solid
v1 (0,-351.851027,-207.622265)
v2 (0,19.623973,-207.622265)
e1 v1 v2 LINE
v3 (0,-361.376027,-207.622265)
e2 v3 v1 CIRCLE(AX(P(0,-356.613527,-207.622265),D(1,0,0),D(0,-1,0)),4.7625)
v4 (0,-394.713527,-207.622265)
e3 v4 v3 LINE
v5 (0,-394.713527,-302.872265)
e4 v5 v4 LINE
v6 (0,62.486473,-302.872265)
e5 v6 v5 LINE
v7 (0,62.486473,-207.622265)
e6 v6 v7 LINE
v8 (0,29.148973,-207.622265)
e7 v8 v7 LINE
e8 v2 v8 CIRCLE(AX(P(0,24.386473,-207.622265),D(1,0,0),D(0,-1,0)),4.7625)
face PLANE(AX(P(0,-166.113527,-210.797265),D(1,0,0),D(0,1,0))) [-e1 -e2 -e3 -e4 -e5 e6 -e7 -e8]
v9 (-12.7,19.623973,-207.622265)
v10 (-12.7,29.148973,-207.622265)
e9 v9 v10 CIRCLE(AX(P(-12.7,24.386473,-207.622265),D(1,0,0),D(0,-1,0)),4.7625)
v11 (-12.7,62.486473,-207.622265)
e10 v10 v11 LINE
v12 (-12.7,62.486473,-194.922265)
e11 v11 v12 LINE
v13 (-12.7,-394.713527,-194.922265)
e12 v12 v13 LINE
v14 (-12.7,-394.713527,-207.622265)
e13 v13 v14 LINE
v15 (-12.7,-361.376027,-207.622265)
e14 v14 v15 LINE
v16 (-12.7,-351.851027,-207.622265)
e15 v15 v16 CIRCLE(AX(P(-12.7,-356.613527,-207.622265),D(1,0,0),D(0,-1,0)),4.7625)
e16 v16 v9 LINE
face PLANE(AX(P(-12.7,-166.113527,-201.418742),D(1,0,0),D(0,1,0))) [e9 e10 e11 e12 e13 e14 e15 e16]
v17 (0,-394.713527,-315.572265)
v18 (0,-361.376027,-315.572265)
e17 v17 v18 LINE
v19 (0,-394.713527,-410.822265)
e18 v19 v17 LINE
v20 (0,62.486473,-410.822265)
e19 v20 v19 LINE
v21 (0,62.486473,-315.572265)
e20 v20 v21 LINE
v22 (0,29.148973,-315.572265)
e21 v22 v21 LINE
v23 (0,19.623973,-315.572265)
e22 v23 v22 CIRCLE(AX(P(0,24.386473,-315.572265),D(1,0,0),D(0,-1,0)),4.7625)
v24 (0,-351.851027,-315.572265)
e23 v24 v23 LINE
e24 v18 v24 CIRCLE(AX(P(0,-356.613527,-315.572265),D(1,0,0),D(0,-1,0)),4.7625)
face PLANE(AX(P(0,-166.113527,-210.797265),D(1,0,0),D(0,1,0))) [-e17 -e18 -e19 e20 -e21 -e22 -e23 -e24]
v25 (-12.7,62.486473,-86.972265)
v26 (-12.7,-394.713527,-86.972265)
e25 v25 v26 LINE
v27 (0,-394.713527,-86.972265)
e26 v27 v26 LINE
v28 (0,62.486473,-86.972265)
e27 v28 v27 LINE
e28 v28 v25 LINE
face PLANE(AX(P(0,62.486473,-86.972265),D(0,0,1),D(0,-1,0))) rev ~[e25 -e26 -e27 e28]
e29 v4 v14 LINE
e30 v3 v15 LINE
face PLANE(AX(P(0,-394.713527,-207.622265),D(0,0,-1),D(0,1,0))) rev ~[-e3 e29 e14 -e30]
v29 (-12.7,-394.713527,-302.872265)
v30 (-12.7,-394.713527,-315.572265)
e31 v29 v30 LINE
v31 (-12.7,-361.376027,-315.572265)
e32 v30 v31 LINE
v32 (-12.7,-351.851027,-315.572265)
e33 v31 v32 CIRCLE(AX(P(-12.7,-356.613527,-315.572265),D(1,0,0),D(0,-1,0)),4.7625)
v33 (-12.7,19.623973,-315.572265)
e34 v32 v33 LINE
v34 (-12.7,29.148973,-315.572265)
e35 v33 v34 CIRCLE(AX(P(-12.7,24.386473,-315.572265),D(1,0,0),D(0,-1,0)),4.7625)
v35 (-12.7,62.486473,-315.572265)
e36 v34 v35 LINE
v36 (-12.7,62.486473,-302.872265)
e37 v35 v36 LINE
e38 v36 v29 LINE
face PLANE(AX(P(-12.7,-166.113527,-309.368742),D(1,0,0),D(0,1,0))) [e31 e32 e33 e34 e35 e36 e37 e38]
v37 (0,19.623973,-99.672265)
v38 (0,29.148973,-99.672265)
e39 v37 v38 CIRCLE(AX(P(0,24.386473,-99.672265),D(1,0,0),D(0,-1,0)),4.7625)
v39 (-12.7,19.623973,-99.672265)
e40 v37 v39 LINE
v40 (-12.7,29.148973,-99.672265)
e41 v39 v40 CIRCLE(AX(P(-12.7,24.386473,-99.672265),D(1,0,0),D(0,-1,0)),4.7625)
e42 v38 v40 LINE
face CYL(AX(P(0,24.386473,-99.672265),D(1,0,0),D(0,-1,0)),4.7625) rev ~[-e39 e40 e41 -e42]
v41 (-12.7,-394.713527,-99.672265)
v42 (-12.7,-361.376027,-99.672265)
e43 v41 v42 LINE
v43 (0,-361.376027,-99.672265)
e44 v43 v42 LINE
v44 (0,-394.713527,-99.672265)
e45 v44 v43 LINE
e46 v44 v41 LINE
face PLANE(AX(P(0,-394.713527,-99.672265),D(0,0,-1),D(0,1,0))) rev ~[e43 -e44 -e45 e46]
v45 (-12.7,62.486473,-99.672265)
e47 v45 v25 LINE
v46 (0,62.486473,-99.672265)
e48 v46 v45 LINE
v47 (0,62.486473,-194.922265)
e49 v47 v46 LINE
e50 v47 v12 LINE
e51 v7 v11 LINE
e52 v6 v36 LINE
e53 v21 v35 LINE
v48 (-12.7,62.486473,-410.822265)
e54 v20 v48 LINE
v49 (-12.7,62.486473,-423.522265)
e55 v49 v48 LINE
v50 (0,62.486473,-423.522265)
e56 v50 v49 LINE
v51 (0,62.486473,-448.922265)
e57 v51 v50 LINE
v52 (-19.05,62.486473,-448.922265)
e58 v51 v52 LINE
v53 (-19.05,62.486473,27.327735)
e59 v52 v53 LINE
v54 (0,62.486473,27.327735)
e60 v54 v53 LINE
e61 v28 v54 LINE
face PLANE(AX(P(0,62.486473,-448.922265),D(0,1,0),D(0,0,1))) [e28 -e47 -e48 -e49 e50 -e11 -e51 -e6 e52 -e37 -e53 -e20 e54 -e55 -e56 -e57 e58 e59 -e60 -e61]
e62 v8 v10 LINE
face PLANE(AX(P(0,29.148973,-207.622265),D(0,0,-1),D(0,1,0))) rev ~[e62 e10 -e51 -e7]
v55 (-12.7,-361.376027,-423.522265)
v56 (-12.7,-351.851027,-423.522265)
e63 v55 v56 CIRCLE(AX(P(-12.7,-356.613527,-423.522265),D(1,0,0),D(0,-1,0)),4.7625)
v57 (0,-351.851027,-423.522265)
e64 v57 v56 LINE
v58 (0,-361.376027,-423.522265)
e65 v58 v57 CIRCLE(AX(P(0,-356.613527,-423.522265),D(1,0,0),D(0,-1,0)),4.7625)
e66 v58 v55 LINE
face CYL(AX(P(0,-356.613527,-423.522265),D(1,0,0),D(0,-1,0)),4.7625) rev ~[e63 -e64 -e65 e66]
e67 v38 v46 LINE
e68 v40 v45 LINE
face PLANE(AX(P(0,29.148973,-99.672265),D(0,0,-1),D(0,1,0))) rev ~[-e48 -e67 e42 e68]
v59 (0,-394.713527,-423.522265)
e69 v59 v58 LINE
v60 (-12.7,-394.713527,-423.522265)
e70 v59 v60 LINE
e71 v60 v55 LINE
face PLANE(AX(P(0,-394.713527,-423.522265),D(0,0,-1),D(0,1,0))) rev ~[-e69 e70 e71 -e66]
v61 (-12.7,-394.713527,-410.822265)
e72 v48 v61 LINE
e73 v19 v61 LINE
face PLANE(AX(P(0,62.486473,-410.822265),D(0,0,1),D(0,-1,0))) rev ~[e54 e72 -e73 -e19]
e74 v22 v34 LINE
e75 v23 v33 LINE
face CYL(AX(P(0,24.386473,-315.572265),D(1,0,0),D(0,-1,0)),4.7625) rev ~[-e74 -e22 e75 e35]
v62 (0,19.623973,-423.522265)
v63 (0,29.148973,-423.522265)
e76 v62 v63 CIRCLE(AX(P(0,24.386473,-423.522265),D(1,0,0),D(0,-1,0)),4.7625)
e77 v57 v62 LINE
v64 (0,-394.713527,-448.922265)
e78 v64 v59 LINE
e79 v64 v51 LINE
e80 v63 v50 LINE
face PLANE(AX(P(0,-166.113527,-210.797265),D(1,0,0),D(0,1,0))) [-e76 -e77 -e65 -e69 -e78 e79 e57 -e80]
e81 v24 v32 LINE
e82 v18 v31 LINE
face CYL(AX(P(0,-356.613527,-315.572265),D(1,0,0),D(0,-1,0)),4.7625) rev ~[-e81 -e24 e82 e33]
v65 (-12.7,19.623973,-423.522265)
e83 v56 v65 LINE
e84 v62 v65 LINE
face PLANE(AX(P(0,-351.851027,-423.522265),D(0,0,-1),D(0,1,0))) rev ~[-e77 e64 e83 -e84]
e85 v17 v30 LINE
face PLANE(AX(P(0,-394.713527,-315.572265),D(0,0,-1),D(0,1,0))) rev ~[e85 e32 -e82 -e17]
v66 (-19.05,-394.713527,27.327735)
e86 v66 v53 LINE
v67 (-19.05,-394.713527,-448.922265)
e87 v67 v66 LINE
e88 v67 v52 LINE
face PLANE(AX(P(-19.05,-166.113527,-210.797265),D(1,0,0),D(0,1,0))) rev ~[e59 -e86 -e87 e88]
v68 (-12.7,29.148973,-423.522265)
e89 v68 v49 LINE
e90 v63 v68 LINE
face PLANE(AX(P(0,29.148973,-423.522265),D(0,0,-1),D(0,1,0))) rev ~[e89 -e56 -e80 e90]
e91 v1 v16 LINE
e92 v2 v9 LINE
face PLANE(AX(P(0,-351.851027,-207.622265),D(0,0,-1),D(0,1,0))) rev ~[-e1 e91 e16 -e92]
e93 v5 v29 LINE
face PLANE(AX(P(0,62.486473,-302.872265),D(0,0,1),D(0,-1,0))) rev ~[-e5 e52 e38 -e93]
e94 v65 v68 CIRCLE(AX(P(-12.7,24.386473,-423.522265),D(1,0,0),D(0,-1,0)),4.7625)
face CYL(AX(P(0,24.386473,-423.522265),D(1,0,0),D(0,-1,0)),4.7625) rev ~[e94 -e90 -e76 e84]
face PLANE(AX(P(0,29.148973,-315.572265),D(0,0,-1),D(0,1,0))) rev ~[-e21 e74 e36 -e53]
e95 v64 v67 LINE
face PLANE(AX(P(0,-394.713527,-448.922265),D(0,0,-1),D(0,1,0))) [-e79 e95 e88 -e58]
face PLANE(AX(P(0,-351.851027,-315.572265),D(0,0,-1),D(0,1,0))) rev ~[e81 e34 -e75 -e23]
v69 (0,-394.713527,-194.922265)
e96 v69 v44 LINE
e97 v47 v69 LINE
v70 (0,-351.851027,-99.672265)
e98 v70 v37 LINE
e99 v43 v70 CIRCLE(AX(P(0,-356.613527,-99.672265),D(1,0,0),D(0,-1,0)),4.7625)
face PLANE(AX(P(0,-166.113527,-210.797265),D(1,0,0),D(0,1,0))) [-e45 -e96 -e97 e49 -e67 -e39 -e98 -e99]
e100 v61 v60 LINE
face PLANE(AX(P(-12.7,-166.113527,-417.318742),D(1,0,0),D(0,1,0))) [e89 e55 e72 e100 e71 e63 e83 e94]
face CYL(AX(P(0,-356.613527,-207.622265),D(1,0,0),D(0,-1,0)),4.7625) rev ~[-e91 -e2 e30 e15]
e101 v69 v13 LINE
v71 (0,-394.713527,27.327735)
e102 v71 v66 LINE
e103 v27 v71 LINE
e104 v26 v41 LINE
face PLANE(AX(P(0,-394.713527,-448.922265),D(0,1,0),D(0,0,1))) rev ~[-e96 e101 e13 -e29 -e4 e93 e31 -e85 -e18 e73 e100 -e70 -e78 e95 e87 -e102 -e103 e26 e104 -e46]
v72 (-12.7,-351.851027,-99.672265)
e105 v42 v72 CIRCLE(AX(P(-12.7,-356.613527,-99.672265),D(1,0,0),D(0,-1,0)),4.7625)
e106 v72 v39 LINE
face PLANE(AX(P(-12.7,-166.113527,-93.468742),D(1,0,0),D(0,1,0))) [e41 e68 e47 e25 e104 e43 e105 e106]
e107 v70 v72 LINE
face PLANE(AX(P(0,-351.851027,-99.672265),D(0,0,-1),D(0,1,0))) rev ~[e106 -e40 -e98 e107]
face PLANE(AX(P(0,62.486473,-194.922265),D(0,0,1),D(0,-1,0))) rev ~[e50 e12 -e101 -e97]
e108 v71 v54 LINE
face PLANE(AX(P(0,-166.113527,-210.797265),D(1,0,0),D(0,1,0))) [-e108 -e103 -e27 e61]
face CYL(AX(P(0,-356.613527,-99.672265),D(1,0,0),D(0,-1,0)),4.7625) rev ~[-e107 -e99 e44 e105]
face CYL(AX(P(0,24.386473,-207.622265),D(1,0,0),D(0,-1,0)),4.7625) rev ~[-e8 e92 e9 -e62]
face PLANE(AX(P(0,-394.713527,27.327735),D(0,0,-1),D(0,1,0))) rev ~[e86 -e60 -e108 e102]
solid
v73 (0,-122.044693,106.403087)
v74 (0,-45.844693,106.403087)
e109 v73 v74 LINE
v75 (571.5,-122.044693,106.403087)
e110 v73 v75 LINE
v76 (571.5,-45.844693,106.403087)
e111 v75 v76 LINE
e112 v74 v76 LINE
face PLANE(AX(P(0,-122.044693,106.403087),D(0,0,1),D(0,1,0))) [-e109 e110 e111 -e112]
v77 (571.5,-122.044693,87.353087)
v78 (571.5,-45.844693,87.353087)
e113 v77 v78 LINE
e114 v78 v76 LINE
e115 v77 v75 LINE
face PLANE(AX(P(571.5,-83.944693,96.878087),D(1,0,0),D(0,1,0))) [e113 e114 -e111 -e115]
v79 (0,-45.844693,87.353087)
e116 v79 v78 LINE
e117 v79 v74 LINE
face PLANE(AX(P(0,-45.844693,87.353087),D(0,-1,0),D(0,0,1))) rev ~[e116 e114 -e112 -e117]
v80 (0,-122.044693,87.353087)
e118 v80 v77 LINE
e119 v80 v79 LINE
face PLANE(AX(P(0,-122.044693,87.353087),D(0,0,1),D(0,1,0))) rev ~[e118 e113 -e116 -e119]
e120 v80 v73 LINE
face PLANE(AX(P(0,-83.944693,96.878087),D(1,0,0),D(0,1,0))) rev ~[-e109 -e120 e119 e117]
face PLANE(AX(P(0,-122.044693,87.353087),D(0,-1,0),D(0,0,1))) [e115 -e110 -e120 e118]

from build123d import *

# Parameters (mm, degrees)
F0_W     = 457.2
F0_H     = 476.25
F2_DEPTH = 19.05
F3_DEPTH = 12.7
F4_DEPTH = 12.7
F5_W     = 76.2
F5_H     = 19.05
F6_DEPTH = 571.5


# Not quite as in the source:
# - a feature names something its author has since deleted; it is built from what else it names


with BuildPart() as f2:
    # F0 (on Right) → F2 (new body)
    with BuildSketch(Plane.YZ):
        with Locations((-166.1135266319, -210.7972649872)):
            Rectangle(F0_W, F0_H)
    extrude(amount=-F2_DEPTH)

    # F1 (on face) → F3 (cut)
    with BuildSketch(Plane.YZ):
        with BuildLine():
            Line((-394.7135266319, -410.8222649872), (-394.7135266319, -423.5222649872))
            Line((-394.7135266319, -423.5222649872), (-361.3760266319, -423.5222649872))
            ThreePointArc((-361.3760266319, -423.5222649872), (-356.6135266319, -428.2847649872), (-351.8510266319, -423.5222649872))
            Line((-351.8510266319, -423.5222649872), (19.6239733681, -423.5222649872))
            ThreePointArc((19.6239733681, -423.5222649872), (24.3864733681, -428.2847649872), (29.1489733681, -423.5222649872))
            Line((29.1489733681, -423.5222649872), (62.4864733681, -423.5222649872))
            Line((62.4864733681, -423.5222649872), (62.4864733681, -410.8222649872))
            Line((62.4864733681, -410.8222649872), (-394.7135266319, -410.8222649872))
        make_face()
    extrude(amount=-F3_DEPTH, mode=Mode.SUBTRACT)

    # F1 (on face) → F4 (cut)
    with BuildSketch(Plane.YZ):
        with BuildLine():
            Line((-394.7135266319, -302.8722649872), (-394.7135266319, -315.5722649872))
            Line((-394.7135266319, -315.5722649872), (-361.3760266319, -315.5722649872))
            ThreePointArc((-361.3760266319, -315.5722649872), (-356.6135266319, -320.3347649872), (-351.8510266319, -315.5722649872))
            Line((-351.8510266319, -315.5722649872), (19.6239733681, -315.5722649872))
            ThreePointArc((19.6239733681, -315.5722649872), (24.3864733681, -320.3347649872), (29.1489733681, -315.5722649872))
            Line((29.1489733681, -315.5722649872), (62.4864733681, -315.5722649872))
            Line((62.4864733681, -315.5722649872), (62.4864733681, -302.8722649872))
            Line((62.4864733681, -302.8722649872), (-394.7135266319, -302.8722649872))
        make_face()
        with BuildLine():
            Line((-394.7135266319, -194.9222649872), (-394.7135266319, -207.6222649872))
            Line((-394.7135266319, -207.6222649872), (-361.3760266319, -207.6222649872))
            ThreePointArc((-361.3760266319, -207.6222649872), (-356.6135266319, -212.3847649872), (-351.8510266319, -207.6222649872))
            Line((-351.8510266319, -207.6222649872), (19.6239733681, -207.6222649872))
            ThreePointArc((19.6239733681, -207.6222649872), (24.3864733681, -212.3847649872), (29.1489733681, -207.6222649872))
            Line((29.1489733681, -207.6222649872), (62.4864733681, -207.6222649872))
            Line((62.4864733681, -207.6222649872), (62.4864733681, -194.9222649872))
            Line((62.4864733681, -194.9222649872), (-394.7135266319, -194.9222649872))
        make_face()
        with BuildLine():
            Line((-394.7135266319, -86.9722649872), (-394.7135266319, -99.6722649872))
            Line((-394.7135266319, -99.6722649872), (-361.3760266319, -99.6722649872))
            ThreePointArc((-361.3760266319, -99.6722649872), (-356.6135266319, -104.4347649872), (-351.8510266319, -99.6722649872))
            Line((-351.8510266319, -99.6722649872), (19.6239733681, -99.6722649872))
            ThreePointArc((19.6239733681, -99.6722649872), (24.3864733681, -104.4347649872), (29.1489733681, -99.6722649872))
            Line((29.1489733681, -99.6722649872), (62.4864733681, -99.6722649872))
            Line((62.4864733681, -99.6722649872), (62.4864733681, -86.9722649872))
            Line((62.4864733681, -86.9722649872), (-394.7135266319, -86.9722649872))
        make_face()
    extrude(amount=-F4_DEPTH, mode=Mode.SUBTRACT)


with BuildPart() as f6:
    # F5 (on Right) → F6 (new body)
    with BuildSketch(Plane.YZ):
        with Locations((-83.9446932077, 96.8780869972)):
            Rectangle(F5_W, F5_H)
    extrude(amount=F6_DEPTH)


solid = Compound([f2.part, f6.part])
